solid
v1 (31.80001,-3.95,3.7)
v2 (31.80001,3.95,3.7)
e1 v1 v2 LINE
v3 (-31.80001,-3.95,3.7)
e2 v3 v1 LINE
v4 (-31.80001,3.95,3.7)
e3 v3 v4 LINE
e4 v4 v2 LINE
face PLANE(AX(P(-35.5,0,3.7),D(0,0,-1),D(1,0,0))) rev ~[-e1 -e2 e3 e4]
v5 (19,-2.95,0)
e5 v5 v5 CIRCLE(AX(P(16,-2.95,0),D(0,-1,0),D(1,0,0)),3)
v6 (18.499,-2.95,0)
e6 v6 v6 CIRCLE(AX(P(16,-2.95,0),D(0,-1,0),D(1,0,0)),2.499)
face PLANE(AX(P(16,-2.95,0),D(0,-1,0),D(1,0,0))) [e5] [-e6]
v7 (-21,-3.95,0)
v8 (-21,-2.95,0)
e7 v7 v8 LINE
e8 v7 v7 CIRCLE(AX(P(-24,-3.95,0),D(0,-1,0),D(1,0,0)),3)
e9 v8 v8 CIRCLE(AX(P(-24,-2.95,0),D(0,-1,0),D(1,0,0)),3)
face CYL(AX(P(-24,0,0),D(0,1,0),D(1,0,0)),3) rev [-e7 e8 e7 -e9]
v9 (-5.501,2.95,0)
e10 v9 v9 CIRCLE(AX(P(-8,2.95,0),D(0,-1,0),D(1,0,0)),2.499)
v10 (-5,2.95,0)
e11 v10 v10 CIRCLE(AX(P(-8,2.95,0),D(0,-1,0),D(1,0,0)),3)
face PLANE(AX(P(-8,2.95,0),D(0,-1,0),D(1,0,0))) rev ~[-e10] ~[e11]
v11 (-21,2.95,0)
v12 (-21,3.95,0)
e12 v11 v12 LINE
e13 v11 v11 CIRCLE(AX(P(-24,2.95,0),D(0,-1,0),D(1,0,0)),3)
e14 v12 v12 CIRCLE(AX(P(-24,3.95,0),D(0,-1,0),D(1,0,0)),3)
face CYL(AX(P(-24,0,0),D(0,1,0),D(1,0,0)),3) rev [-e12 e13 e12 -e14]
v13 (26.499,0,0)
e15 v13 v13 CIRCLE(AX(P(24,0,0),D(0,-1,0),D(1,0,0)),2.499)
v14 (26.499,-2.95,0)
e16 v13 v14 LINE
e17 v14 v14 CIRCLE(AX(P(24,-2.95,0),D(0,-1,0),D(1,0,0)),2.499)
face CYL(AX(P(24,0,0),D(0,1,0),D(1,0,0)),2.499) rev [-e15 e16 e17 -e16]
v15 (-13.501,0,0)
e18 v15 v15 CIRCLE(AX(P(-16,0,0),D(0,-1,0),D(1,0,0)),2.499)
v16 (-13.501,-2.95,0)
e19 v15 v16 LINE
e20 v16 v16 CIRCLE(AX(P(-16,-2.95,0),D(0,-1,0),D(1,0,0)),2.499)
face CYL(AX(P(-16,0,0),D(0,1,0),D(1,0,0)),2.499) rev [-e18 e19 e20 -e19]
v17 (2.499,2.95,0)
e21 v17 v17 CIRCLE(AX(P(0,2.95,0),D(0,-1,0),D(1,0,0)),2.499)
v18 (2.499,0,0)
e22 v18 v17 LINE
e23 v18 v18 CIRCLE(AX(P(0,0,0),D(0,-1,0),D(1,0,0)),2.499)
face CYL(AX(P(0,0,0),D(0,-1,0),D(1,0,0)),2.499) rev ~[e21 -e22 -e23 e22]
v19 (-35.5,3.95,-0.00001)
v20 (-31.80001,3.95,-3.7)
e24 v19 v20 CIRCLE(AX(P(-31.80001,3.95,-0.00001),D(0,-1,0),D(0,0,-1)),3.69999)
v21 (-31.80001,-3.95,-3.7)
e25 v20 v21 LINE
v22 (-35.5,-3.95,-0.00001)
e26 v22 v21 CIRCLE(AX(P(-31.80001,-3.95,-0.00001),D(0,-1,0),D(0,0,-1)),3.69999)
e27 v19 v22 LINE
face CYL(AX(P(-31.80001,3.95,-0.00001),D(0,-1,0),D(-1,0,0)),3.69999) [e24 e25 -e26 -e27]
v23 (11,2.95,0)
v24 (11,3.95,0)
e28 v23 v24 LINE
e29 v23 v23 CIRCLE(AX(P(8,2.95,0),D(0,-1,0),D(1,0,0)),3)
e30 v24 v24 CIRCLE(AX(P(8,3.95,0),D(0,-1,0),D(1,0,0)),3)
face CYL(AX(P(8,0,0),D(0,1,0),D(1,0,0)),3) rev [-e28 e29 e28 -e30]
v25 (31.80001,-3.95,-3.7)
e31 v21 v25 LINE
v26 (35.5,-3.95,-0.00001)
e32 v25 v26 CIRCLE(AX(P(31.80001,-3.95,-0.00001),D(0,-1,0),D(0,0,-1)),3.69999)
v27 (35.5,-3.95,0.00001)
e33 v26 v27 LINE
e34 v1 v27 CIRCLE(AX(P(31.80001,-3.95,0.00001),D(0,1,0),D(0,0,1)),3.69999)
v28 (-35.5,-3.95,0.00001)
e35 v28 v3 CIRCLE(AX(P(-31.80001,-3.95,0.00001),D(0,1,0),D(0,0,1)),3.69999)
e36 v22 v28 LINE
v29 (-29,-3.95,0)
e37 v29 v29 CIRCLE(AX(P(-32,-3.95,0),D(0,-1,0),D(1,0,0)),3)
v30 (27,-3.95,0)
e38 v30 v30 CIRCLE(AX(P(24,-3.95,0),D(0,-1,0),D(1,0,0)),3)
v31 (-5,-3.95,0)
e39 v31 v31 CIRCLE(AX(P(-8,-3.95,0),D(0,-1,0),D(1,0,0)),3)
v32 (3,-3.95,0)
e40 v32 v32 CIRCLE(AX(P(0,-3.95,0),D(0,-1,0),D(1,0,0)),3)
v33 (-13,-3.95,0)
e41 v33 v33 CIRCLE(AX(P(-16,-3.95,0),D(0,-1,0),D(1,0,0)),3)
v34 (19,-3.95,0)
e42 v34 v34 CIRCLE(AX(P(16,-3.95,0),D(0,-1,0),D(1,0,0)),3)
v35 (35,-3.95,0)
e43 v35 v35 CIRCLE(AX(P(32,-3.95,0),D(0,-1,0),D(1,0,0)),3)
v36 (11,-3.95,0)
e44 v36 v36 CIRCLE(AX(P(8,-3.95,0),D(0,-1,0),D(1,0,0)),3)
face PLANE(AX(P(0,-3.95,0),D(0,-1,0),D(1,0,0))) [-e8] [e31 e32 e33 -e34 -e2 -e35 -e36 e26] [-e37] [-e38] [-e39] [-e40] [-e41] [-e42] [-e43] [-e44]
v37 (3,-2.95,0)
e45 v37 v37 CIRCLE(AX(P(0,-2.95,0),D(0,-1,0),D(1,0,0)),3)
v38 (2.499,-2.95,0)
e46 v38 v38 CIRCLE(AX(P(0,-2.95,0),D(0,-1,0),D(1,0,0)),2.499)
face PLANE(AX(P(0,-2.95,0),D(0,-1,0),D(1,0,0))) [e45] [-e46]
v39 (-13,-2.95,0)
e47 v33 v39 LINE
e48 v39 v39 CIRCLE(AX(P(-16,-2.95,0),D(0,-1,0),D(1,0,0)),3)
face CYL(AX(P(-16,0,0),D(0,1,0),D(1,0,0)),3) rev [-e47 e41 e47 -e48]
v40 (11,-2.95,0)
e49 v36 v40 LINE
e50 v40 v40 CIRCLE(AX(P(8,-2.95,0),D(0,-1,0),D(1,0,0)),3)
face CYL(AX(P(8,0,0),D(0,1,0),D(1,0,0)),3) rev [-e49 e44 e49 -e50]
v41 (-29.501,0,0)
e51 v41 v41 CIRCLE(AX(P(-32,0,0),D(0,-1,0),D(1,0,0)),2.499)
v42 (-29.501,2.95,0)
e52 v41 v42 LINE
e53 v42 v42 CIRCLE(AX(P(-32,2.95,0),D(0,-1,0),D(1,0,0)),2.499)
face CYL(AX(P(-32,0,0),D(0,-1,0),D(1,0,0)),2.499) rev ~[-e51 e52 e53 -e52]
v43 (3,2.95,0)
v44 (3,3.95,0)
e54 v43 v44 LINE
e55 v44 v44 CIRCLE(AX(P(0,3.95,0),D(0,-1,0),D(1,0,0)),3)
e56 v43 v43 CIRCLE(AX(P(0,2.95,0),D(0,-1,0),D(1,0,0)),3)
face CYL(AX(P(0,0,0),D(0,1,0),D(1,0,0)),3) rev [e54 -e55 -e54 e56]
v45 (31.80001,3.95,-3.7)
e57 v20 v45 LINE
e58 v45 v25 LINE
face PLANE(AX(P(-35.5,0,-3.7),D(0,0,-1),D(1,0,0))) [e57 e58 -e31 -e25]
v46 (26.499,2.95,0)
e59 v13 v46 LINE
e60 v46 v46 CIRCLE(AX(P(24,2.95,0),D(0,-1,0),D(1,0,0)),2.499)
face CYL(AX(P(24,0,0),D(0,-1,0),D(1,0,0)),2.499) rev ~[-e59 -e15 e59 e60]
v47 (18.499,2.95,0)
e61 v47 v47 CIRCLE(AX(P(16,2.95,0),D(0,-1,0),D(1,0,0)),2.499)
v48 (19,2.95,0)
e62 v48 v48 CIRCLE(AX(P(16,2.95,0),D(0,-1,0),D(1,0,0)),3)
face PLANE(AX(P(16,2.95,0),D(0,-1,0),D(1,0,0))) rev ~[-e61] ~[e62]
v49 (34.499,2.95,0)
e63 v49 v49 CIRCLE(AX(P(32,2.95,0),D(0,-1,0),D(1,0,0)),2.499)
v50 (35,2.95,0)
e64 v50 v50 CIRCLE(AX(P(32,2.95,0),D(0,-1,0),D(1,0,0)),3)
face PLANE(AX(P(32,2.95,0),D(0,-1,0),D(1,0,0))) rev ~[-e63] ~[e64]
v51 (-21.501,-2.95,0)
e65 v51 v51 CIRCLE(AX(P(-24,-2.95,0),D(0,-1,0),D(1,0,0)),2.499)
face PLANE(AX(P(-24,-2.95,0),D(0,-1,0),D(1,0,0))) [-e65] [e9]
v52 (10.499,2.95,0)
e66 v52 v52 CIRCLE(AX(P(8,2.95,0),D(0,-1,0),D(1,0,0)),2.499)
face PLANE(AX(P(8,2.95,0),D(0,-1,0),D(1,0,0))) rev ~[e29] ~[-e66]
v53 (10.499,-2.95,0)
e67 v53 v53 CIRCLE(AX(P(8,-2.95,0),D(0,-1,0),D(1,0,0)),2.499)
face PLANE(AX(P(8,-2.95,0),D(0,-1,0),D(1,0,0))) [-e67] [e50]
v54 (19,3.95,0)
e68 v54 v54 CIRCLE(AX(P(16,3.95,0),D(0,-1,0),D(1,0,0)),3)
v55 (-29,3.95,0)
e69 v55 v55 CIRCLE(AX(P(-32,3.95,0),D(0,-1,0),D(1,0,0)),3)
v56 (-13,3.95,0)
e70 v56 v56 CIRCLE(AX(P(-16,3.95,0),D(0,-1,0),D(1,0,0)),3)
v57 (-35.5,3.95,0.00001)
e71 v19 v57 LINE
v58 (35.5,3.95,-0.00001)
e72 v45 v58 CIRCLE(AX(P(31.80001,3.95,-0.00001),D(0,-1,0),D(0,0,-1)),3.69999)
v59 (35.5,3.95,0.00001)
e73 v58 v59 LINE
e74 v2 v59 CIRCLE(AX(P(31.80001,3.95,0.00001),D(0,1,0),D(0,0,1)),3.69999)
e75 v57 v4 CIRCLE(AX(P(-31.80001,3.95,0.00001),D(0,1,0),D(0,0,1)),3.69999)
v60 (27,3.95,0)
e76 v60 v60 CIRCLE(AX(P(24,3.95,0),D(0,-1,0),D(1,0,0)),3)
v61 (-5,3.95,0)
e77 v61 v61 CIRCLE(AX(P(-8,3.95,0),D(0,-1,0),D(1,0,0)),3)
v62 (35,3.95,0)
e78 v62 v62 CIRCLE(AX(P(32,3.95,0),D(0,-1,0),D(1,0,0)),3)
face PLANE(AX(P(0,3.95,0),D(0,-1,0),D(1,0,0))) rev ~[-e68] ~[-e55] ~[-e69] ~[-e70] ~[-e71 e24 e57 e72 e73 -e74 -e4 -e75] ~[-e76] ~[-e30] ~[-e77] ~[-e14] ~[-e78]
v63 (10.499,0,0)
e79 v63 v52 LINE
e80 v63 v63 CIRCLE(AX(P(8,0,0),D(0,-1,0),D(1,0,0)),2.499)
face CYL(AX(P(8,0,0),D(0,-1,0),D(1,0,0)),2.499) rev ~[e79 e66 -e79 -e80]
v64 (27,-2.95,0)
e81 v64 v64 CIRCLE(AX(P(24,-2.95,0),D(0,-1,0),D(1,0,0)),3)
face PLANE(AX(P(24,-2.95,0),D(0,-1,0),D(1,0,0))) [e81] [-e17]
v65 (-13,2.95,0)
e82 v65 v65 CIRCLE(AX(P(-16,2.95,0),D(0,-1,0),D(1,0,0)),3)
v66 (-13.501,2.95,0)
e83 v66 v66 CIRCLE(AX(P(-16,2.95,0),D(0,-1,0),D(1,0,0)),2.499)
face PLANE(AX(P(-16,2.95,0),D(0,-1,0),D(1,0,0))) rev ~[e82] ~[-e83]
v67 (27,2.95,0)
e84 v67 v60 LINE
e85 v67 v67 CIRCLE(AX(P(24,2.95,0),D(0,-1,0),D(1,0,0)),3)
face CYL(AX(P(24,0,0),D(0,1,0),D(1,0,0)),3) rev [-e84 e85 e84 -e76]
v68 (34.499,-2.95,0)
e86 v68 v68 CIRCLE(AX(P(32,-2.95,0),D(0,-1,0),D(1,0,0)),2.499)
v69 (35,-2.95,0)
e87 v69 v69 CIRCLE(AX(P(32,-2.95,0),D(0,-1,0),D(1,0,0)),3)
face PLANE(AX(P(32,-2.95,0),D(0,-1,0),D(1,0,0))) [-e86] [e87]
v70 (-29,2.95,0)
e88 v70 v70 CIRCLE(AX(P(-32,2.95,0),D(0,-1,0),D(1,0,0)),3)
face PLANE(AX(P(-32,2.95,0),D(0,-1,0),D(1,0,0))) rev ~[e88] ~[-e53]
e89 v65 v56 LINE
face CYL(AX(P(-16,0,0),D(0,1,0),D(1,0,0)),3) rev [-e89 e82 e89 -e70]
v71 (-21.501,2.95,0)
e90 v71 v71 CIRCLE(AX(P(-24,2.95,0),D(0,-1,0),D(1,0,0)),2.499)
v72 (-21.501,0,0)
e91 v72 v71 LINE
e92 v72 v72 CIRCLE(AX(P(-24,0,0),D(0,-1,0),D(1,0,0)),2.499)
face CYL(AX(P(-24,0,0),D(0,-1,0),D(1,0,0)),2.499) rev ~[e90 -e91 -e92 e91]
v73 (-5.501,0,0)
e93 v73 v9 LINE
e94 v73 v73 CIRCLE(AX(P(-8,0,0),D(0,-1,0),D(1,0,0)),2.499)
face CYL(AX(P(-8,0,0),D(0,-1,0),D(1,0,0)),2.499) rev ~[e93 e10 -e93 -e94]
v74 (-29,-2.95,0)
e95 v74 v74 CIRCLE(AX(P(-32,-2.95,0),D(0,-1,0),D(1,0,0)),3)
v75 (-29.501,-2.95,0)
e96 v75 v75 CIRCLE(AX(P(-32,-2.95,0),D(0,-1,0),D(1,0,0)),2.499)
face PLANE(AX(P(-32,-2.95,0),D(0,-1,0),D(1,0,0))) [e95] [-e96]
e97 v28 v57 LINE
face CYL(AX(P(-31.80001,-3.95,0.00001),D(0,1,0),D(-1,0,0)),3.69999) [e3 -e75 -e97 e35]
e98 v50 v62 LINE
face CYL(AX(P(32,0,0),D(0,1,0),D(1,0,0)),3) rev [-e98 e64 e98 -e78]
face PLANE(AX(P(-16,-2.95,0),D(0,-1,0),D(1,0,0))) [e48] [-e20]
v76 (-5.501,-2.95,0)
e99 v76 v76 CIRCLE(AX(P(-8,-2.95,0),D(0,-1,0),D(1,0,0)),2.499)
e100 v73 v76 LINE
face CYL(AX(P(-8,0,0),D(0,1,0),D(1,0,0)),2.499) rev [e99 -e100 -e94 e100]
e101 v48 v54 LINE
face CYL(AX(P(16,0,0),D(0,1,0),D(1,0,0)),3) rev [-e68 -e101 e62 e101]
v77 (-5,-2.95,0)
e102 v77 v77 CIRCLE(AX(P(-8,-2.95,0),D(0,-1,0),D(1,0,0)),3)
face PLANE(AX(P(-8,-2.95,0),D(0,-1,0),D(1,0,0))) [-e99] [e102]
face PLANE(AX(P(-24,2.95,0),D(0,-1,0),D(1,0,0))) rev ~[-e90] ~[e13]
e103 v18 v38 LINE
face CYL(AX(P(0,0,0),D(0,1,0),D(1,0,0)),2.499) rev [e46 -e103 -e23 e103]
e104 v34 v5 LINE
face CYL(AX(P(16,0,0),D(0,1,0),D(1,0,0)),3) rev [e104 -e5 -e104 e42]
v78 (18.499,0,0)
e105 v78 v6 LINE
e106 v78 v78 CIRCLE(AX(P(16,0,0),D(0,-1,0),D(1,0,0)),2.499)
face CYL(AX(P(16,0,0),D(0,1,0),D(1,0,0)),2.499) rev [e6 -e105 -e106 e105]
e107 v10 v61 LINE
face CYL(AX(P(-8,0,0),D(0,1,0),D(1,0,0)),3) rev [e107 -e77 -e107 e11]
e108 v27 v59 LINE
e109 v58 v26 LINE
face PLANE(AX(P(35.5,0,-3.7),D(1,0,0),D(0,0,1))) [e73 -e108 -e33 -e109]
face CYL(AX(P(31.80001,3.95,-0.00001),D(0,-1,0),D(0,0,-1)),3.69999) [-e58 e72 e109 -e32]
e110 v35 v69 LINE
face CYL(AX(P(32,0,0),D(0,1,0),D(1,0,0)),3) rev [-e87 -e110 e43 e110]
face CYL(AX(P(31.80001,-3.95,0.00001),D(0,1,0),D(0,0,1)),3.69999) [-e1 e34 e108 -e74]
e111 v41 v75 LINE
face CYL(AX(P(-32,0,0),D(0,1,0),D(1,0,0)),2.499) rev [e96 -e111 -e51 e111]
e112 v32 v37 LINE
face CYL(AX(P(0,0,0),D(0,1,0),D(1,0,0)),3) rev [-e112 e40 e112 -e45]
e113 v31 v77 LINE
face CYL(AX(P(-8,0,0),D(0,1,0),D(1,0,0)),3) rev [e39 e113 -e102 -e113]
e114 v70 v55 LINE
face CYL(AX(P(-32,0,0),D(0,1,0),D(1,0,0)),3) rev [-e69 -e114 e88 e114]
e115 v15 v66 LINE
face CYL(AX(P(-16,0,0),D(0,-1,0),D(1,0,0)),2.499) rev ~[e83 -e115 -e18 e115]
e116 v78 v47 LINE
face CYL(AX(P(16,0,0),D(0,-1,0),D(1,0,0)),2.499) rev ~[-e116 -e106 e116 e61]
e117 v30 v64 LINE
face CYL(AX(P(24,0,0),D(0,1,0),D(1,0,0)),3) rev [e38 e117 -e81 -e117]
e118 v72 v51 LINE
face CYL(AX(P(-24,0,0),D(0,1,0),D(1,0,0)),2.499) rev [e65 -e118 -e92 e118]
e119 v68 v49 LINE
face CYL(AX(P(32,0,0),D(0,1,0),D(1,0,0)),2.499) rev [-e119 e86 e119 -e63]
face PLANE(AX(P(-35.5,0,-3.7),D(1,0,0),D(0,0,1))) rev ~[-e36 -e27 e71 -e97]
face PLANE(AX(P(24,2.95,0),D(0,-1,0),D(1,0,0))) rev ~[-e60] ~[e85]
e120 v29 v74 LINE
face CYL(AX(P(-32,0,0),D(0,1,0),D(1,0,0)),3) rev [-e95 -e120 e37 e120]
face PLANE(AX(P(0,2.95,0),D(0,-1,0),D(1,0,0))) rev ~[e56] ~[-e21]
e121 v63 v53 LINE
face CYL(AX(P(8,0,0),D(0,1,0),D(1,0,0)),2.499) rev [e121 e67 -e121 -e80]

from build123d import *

# Parameters (mm, degrees)
F0_W     = 71
F0_H     = 7.4
F0_R     = 3
F1_DEPTH = 3.95
F0_R_2   = 2.499
F2_DEPTH = 2.95
F3_R     = 3.69999


# Not quite as in the source:
# - a fillet or chamfer is up to 0.001 mm smaller than in the source, because OpenCascade refuses the exact size


with BuildPart() as f1:
    # F0 (on Front) → F1 (new body, symmetric)
    with BuildSketch(Plane.XZ):
        Rectangle(F0_W, F0_H)
        with Locations((-32, 0)):
            Circle(F0_R, mode=Mode.SUBTRACT)
        with Locations((-24, 0)):
            Circle(F0_R, mode=Mode.SUBTRACT)
        with Locations((-16, 0)):
            Circle(F0_R, mode=Mode.SUBTRACT)
        with Locations((-8, 0)):
            Circle(F0_R, mode=Mode.SUBTRACT)
        Circle(F0_R, mode=Mode.SUBTRACT)
        with Locations((8, 0)):
            Circle(F0_R, mode=Mode.SUBTRACT)
        with Locations((16, 0)):
            Circle(F0_R, mode=Mode.SUBTRACT)
        with Locations((24, 0)):
            Circle(F0_R, mode=Mode.SUBTRACT)
        with Locations((32, 0)):
            Circle(F0_R, mode=Mode.SUBTRACT)
    extrude(amount=F1_DEPTH, both=True)

    # F0 (on Front) → F2 (join, symmetric)
    with BuildSketch(Plane.XZ):
        with Locations((-32, 0)):
            Circle(F0_R)
        with Locations((-32, 0)):
            Circle(F0_R_2, mode=Mode.SUBTRACT)
        with Locations((-24, 0)):
            Circle(F0_R)
        with Locations((-24, 0)):
            Circle(F0_R_2, mode=Mode.SUBTRACT)
        with Locations((-16, 0)):
            Circle(F0_R)
        with Locations((-16, 0)):
            Circle(F0_R_2, mode=Mode.SUBTRACT)
        with Locations((-8, 0)):
            Circle(F0_R)
        with Locations((-8, 0)):
            Circle(F0_R_2, mode=Mode.SUBTRACT)
        Circle(F0_R)
        Circle(F0_R_2, mode=Mode.SUBTRACT)
        with Locations((8, 0)):
            Circle(F0_R)
        with Locations((8, 0)):
            Circle(F0_R_2, mode=Mode.SUBTRACT)
        with Locations((16, 0)):
            Circle(F0_R)
        with Locations((16, 0)):
            Circle(F0_R_2, mode=Mode.SUBTRACT)
        with Locations((24, 0)):
            Circle(F0_R)
        with Locations((24, 0)):
            Circle(F0_R_2, mode=Mode.SUBTRACT)
        with Locations((32, 0)):
            Circle(F0_R)
        with Locations((32, 0)):
            Circle(F0_R_2, mode=Mode.SUBTRACT)
    extrude(amount=F2_DEPTH, both=True)

    # F3 (radius 3.7 in the source; OpenCascade refuses exactly that, so slightly less here)
    f3_edges = [f1.edges().sort_by_distance(p)[0] for p in [
        (-35.5, 0, 3.7),
        (-35.5, 0, -3.7),
        (35.5, 0, 3.7),
        (35.5, 0, -3.7),
    ]]
    fillet(f3_edges, radius=F3_R)


solid = f1.part
